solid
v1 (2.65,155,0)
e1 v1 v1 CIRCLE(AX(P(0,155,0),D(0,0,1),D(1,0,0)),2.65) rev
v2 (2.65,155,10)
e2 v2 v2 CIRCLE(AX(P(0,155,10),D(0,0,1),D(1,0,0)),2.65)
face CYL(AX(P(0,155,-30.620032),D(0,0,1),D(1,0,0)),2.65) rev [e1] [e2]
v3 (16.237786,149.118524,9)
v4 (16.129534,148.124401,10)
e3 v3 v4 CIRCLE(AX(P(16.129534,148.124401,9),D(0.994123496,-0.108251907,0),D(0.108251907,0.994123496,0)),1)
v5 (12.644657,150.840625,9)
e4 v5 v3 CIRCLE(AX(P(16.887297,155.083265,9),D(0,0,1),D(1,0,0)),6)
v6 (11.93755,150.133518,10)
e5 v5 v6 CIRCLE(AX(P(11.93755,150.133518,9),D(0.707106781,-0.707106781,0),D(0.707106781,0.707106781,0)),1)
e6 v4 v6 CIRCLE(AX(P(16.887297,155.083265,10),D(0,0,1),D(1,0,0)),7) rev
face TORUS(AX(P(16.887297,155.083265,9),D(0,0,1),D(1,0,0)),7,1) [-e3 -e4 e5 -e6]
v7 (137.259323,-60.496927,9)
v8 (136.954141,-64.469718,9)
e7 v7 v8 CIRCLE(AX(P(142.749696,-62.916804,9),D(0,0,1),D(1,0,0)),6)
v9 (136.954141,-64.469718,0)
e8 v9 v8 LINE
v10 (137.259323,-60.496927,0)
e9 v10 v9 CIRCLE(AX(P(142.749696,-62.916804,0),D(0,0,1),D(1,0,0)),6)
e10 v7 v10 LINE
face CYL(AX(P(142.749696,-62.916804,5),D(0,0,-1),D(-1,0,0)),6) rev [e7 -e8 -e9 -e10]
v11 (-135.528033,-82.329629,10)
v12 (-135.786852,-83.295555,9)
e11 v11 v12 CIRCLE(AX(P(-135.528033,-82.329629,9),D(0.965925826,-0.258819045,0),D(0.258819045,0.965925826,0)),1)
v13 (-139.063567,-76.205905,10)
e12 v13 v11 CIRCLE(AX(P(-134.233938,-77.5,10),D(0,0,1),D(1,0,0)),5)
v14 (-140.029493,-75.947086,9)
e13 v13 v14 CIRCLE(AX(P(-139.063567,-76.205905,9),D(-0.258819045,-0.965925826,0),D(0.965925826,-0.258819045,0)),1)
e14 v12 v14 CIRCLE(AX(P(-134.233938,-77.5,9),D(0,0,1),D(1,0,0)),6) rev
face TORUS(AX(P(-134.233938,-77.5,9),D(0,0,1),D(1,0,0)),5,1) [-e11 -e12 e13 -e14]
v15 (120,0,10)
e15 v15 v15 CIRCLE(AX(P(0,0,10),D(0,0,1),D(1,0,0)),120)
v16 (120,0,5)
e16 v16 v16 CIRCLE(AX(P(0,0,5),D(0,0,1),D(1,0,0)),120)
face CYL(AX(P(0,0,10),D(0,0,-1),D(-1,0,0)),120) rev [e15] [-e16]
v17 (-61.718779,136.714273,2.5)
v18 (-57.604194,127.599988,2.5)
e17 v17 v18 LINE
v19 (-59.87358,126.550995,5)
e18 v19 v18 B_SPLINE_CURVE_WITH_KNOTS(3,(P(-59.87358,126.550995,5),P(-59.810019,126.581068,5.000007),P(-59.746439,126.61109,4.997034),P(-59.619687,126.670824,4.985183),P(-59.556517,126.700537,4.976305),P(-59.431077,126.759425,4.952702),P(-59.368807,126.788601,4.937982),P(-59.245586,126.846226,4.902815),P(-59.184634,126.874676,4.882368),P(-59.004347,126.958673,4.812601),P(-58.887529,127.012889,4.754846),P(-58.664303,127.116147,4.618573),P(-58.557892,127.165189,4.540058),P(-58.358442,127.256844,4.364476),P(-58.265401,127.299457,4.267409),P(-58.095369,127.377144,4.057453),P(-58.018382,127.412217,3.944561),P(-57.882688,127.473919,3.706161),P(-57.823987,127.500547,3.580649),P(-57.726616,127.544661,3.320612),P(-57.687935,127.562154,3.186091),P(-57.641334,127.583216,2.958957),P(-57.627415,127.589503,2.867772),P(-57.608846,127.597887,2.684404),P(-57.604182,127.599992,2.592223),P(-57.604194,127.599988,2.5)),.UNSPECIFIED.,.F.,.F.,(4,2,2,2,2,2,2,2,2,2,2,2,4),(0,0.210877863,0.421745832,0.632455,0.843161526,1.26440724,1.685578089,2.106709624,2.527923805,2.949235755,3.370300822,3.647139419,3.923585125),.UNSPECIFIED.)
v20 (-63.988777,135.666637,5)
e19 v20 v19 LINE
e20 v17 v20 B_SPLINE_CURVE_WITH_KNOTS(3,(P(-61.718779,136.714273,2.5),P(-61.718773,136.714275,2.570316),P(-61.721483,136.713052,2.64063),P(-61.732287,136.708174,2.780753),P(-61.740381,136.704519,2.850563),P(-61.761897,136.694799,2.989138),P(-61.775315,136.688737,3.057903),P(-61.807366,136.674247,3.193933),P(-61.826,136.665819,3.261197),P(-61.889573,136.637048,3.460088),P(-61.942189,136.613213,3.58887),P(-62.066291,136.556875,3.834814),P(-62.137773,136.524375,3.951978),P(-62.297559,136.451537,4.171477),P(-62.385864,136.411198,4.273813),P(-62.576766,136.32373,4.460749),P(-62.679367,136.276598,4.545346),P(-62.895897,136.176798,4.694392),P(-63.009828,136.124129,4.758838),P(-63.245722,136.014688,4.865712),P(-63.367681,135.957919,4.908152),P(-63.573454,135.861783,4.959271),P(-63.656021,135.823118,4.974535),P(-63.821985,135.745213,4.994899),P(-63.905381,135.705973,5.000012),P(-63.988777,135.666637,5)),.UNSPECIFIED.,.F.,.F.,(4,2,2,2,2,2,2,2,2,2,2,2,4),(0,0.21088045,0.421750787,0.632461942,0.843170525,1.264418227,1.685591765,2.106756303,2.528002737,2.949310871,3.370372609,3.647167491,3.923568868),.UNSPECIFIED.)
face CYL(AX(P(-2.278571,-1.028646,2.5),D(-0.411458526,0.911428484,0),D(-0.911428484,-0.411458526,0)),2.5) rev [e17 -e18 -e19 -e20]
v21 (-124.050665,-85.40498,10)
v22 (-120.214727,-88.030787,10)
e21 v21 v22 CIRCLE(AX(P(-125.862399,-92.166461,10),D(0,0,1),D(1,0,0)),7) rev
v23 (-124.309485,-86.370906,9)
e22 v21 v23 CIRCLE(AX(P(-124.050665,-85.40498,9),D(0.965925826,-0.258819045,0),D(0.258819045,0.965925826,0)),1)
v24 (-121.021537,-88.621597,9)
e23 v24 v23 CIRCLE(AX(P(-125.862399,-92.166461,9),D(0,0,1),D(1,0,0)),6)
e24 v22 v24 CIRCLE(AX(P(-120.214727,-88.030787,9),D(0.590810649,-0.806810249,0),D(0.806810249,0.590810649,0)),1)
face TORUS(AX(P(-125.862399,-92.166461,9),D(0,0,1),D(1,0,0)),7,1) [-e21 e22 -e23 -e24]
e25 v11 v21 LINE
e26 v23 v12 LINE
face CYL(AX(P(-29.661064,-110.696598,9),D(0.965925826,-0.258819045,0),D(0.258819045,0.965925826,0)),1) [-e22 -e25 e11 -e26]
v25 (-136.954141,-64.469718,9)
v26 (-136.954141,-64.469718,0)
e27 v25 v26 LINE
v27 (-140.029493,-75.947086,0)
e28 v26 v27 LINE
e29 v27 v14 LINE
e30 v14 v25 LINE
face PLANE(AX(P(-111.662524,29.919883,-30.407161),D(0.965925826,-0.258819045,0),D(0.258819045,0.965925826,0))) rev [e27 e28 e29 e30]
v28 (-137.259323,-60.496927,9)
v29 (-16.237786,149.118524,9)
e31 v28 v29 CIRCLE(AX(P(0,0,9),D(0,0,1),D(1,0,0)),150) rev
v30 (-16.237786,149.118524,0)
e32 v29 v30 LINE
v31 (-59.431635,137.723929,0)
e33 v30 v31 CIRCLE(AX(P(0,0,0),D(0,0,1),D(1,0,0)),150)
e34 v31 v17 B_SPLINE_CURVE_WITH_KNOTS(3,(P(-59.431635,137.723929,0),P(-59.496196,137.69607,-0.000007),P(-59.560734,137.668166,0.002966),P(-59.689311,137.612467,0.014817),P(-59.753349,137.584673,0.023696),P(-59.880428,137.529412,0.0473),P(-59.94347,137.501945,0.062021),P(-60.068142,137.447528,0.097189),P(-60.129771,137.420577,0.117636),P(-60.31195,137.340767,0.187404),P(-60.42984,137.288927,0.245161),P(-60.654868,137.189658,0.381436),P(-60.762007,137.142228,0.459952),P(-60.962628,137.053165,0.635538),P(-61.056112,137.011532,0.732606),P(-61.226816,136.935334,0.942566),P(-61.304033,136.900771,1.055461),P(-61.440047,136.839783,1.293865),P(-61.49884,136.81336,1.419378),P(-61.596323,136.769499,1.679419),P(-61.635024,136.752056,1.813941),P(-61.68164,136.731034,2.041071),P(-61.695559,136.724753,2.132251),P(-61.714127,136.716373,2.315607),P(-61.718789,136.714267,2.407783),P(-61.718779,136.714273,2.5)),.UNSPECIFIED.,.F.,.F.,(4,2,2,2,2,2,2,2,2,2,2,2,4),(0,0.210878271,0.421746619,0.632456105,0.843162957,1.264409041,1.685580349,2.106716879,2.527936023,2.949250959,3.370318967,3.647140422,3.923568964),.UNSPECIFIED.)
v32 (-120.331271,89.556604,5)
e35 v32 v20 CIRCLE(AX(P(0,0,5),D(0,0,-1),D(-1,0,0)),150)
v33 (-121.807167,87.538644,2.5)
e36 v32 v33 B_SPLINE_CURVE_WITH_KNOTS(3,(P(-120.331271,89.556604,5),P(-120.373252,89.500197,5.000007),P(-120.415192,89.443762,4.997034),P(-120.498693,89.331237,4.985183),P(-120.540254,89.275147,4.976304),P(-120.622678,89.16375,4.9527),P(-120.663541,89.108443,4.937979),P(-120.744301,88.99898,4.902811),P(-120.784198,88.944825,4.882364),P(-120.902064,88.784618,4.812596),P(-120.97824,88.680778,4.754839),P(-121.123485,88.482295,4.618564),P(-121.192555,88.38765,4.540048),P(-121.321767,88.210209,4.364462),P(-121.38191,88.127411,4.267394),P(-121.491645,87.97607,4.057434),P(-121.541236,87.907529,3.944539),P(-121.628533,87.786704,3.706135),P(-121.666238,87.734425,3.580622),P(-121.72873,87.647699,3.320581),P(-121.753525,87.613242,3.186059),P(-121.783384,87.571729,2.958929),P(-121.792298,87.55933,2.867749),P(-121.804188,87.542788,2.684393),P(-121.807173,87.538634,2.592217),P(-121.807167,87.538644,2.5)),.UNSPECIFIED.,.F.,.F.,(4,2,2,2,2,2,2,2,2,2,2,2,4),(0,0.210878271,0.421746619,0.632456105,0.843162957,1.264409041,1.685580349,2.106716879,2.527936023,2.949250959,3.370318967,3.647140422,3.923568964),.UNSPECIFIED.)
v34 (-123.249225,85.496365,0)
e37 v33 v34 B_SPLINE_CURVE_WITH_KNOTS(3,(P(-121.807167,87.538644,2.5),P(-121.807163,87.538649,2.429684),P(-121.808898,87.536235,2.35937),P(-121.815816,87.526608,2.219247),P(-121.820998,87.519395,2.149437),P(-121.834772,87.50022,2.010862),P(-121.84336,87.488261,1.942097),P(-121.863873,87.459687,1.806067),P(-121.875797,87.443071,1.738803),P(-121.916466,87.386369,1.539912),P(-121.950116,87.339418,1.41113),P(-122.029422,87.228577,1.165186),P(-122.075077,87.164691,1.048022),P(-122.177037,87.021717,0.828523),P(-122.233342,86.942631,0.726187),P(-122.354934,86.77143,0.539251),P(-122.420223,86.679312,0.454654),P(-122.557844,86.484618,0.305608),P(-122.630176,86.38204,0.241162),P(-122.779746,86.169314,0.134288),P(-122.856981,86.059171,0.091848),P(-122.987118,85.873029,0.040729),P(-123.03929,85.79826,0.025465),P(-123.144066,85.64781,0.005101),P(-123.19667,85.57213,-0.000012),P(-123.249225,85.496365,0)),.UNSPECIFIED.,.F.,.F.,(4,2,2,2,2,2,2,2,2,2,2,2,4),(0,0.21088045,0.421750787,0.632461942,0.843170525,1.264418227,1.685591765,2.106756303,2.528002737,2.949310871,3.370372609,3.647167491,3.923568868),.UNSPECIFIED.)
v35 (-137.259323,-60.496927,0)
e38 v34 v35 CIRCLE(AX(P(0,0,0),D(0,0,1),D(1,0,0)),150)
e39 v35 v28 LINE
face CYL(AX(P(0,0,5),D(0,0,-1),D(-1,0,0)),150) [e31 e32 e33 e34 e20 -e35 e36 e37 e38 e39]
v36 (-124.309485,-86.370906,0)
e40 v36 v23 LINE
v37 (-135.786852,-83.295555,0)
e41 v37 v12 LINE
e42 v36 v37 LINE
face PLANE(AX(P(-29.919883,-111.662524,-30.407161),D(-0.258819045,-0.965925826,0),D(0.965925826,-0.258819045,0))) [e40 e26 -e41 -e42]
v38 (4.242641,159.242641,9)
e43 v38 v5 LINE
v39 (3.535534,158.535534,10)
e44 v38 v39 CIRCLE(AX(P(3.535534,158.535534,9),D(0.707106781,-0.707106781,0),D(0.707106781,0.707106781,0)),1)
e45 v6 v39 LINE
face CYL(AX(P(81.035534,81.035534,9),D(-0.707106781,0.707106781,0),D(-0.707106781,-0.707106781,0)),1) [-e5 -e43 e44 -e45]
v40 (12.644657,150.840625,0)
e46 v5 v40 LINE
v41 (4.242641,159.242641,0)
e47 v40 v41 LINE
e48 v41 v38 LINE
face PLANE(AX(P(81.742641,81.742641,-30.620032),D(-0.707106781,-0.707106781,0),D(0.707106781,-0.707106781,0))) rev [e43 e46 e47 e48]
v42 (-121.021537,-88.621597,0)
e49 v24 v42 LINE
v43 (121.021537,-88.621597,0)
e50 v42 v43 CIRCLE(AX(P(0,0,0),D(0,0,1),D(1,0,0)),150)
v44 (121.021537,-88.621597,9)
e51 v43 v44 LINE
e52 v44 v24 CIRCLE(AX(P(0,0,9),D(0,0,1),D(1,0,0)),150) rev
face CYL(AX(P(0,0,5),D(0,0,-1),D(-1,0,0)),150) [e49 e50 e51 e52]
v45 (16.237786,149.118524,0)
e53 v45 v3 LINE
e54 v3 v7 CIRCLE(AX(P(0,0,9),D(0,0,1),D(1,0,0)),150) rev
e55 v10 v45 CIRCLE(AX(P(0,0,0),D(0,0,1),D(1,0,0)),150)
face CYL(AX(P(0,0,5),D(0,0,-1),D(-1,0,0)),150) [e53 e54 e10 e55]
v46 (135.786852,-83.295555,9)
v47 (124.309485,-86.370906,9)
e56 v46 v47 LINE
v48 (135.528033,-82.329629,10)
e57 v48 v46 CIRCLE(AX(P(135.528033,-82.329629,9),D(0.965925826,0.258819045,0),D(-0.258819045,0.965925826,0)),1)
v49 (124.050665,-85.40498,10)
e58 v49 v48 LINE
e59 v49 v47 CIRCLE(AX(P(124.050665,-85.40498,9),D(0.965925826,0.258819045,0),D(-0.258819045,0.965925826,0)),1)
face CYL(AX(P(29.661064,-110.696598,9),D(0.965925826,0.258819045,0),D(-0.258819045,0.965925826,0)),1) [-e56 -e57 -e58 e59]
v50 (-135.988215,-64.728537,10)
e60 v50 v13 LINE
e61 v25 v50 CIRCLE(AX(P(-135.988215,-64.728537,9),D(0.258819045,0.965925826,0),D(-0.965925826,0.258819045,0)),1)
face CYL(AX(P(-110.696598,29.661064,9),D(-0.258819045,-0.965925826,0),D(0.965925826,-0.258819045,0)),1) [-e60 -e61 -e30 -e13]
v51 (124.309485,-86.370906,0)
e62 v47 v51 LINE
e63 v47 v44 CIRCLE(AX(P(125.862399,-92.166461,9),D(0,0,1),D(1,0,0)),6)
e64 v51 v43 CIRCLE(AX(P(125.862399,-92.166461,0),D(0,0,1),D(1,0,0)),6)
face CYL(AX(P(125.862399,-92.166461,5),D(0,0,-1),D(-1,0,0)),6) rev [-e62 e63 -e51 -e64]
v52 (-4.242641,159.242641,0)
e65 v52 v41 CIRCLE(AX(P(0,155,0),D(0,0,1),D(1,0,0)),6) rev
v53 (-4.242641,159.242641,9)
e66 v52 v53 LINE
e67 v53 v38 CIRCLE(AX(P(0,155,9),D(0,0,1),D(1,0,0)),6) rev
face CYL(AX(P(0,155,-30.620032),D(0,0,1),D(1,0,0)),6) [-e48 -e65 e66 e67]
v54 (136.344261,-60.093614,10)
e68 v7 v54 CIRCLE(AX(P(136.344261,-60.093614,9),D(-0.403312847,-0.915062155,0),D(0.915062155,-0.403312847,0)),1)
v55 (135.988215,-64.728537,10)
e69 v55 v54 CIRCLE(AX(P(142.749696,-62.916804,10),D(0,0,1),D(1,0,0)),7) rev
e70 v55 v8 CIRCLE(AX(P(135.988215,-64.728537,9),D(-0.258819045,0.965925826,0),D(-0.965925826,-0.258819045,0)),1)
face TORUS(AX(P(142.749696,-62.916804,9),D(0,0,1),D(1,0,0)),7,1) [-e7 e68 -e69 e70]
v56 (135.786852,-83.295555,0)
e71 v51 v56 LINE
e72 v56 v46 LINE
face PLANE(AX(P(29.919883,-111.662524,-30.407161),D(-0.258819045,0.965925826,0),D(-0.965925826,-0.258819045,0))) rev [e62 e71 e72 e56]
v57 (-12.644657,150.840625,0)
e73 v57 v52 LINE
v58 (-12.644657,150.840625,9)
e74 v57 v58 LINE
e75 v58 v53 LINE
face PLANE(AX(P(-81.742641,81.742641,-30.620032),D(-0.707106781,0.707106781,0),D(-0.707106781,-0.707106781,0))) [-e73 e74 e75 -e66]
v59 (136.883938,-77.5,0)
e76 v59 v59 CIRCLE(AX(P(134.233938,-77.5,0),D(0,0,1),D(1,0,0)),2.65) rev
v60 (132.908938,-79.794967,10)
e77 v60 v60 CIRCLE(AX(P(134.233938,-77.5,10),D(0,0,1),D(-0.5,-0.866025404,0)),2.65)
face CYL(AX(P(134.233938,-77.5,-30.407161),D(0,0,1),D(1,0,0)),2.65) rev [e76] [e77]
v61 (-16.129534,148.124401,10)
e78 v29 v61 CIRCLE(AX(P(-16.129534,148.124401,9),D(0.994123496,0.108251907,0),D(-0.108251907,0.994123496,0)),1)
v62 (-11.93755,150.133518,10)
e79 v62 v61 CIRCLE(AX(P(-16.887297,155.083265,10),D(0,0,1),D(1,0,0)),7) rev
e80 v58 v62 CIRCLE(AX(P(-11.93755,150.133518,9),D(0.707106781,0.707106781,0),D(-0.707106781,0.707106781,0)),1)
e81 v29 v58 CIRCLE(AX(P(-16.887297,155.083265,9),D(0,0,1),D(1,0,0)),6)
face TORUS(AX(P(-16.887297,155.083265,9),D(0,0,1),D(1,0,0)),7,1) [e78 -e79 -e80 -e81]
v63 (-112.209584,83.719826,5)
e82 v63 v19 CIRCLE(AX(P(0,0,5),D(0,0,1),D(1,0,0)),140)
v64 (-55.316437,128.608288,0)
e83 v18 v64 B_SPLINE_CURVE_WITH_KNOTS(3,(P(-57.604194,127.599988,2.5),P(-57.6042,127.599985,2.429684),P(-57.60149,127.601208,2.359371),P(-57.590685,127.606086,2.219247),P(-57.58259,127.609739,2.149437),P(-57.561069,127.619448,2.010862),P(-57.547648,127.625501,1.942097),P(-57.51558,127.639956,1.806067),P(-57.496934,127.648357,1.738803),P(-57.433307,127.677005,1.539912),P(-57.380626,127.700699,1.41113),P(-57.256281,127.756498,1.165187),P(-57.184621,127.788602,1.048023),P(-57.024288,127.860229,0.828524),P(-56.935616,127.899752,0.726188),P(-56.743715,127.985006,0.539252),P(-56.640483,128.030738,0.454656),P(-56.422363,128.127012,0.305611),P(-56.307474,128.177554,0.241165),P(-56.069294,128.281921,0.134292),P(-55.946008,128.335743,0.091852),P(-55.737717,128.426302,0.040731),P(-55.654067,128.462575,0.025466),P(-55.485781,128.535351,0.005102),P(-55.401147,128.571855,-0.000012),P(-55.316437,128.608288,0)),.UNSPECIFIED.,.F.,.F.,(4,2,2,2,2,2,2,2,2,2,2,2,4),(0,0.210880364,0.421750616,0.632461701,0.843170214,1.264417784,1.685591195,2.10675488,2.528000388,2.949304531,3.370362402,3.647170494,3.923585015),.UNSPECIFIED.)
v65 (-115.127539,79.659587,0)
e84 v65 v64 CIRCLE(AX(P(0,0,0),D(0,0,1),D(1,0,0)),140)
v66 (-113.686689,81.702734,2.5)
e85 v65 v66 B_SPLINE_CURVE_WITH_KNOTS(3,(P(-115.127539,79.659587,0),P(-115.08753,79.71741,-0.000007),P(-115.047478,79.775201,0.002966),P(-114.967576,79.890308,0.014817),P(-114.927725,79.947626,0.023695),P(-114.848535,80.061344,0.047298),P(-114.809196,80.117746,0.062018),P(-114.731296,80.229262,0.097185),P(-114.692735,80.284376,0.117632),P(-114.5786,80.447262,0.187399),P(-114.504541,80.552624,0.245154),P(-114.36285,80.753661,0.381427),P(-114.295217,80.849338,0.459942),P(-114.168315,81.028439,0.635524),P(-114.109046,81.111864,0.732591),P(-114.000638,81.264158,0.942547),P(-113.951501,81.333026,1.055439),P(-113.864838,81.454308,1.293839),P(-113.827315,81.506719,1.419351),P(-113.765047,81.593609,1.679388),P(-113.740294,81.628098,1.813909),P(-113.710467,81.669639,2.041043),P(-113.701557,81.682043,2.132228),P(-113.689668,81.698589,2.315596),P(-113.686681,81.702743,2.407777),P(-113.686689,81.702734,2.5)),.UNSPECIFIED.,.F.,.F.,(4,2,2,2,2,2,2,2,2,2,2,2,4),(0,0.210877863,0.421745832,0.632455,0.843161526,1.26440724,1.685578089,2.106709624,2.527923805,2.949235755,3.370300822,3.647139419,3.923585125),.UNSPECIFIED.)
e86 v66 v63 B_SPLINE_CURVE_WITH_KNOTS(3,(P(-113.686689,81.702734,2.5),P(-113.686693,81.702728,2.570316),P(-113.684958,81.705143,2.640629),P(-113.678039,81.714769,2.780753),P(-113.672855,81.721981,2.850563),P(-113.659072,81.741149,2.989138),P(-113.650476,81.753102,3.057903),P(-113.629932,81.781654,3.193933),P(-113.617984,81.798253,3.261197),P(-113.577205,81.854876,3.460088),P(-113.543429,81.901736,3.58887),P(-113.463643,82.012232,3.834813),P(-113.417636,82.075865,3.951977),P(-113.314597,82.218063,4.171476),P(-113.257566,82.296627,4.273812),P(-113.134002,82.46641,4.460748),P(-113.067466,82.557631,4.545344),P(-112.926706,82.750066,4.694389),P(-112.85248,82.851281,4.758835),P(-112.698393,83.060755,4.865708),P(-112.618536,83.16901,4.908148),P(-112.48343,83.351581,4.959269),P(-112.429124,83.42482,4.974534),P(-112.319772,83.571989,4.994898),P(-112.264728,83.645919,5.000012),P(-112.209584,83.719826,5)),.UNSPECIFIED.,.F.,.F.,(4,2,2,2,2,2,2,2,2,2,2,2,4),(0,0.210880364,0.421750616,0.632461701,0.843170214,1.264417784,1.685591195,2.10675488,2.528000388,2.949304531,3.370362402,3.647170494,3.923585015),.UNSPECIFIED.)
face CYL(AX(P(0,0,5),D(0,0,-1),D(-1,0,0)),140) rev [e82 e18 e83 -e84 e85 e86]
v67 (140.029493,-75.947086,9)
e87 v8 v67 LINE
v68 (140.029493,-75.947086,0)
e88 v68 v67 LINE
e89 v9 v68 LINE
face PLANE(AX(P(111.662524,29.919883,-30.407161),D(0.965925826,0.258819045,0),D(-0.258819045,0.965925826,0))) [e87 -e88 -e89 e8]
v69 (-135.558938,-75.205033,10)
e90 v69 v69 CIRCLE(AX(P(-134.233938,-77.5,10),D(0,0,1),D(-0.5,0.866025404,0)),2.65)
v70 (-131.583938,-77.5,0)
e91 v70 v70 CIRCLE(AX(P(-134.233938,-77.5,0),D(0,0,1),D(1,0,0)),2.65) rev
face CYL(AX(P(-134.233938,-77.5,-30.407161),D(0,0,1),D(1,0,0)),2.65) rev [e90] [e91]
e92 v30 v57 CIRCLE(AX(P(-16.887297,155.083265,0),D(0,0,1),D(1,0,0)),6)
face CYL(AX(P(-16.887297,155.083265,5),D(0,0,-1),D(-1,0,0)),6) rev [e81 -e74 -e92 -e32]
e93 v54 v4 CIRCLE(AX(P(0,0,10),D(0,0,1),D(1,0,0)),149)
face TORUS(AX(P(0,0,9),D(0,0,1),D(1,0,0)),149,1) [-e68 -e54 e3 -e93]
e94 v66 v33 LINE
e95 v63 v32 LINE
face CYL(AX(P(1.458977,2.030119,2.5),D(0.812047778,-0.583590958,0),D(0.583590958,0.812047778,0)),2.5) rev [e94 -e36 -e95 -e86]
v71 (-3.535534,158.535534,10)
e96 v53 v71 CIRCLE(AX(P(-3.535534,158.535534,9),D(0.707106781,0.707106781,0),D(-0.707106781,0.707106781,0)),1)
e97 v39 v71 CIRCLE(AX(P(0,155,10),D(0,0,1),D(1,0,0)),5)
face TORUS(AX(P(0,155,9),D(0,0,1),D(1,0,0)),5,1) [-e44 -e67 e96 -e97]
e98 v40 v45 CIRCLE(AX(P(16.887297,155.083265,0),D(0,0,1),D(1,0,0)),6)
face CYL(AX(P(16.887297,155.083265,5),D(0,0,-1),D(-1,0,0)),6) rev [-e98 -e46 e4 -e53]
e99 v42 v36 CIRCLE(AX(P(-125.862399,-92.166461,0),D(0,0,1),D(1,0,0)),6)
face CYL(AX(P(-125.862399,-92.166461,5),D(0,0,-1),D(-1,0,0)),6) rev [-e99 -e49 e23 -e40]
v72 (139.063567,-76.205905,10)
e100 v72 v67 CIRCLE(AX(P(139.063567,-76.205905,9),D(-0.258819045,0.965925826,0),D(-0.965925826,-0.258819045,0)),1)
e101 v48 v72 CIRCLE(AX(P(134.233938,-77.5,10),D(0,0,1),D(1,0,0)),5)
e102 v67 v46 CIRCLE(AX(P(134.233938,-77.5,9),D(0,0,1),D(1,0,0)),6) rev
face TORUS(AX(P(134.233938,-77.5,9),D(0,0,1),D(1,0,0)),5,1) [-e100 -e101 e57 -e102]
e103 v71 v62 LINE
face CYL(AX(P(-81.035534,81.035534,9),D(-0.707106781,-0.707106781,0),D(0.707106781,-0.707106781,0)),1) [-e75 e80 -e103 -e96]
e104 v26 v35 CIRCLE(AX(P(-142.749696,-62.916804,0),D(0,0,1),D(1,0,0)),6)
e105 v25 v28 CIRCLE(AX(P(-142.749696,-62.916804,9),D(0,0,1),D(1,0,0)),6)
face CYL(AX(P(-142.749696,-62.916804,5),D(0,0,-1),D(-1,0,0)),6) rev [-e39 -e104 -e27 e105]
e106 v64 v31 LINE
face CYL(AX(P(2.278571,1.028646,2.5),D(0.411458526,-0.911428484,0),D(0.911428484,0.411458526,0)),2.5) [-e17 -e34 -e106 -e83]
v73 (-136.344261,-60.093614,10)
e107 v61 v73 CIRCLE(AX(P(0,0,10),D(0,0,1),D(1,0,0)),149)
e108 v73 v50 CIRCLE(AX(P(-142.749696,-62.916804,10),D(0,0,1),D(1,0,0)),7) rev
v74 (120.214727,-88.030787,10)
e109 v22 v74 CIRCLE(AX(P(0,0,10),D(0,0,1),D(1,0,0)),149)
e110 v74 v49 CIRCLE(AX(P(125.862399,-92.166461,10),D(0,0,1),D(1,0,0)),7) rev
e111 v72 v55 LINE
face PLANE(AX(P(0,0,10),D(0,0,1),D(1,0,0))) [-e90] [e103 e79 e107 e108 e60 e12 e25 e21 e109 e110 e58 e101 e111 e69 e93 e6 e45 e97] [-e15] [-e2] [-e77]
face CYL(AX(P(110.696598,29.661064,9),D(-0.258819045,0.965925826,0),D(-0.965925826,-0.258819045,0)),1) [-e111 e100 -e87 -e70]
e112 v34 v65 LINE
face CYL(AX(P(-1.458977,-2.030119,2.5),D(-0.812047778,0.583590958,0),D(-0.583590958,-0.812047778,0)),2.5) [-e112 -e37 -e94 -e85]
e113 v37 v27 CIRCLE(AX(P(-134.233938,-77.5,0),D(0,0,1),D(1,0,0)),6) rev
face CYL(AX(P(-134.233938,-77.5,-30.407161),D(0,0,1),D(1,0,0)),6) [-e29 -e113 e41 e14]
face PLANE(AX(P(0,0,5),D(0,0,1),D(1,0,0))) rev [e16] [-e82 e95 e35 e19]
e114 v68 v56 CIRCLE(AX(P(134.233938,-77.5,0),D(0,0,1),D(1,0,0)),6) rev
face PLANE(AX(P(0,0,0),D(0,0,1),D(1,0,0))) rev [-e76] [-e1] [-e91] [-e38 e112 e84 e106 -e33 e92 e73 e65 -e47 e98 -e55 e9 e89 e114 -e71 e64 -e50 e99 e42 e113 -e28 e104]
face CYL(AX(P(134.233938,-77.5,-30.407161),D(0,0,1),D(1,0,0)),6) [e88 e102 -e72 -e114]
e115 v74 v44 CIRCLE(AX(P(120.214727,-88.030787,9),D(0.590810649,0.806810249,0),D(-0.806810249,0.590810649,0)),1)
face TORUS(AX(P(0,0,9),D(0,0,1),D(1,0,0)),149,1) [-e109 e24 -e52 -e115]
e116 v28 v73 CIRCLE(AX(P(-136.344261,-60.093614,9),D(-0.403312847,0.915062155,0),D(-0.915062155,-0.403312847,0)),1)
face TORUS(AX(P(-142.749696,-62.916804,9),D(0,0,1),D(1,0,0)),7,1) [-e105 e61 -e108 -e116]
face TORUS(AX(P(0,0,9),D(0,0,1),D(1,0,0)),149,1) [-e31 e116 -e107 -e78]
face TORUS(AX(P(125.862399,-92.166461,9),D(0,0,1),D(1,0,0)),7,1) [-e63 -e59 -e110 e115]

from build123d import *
from build123d.topology import SkipClean

# Parameters (mm, degrees)
SKETCH1_R                = 150
SKETCH1_R_2              = 140
BOSS_EXTRUDE1_DEPTH      = 5
SKETCH2_R                = 150
SKETCH2_R_2              = 120
BOSS_EXTRUDE2_DEPTH      = 5
BOSS_EXTRUDE3_START      = -10
SKETCH3_R                = 2.65
BOSS_EXTRUDE3_DEPTH      = 10
FILLET1_R                = 6
CIRPATTERN1_COUNT        = 3
FILLET1_OF_CIRPATTERN1_R = 6
FILLET2_R                = 1
CUT_EXTRUDE2_DEPTH       = 5
FILLET3_R                = 2.5


with BuildPart() as part:
    # Sketch1 → Boss-Extrude1 (new body)
    with BuildSketch(Plane.XY):
        Circle(SKETCH1_R)
        Circle(SKETCH1_R_2, mode=Mode.SUBTRACT)
    extrude(amount=BOSS_EXTRUDE1_DEPTH)

    # Sketch2 → Boss-Extrude2 (add)
    with BuildSketch(Plane.XY.offset(5)):
        Circle(SKETCH2_R)
        Circle(SKETCH2_R_2, mode=Mode.SUBTRACT)
    extrude(amount=BOSS_EXTRUDE2_DEPTH)

    # Sketch3 → Boss-Extrude3 (add)
    with BuildSketch(Plane.XY.offset(10).offset(BOSS_EXTRUDE3_START)):
        with BuildLine():
            ThreePointArc((-14.154618867, 149.330662507), (0, 150), (14.154618867, 149.330662507))
            Line((14.154618867, 149.330662507), (4.242640687, 159.242640687))
            ThreePointArc((4.242640687, 159.242640687), (0, 161), (-4.242640687, 159.242640687))
            Line((-4.242640687, 159.242640687), (-14.154618867, 149.330662507))
        make_face()
        with Locations((0, 155)):
            Circle(SKETCH3_R, mode=Mode.SUBTRACT)
    boss_extrude3 = extrude(amount=BOSS_EXTRUDE3_DEPTH)

    # Fillet1
    fillet1_edges = [part.edges().sort_by_distance(p)[0] for p in [
        (-14.154618867, 149.330662507, 5),
        (14.154618867, 149.330662507, 5),
    ]]
    fillet(fillet1_edges, radius=FILLET1_R)

    # CirPattern1: Boss-Extrude3 ×3 about axis
    cirpattern1_axis = Axis((0, 0, 0), (0, 0, 1))
    for i in range(1, CIRPATTERN1_COUNT):
        add(boss_extrude3.rotate(cirpattern1_axis, i * 360 / CIRPATTERN1_COUNT))

    # Fillet1 of CirPattern1
    fillet1_of_cirpattern1_edges = [part.edges().sort_by_distance(p)[0] for p in [
        (-122.246837861, -86.923590773, 5),
        (-136.401456729, -62.407071733, 5),
        (136.401456729, -62.407071733, 5),
        (122.246837861, -86.923590773, 5),
    ]]
    fillet(fillet1_of_cirpattern1_edges, radius=FILLET1_OF_CIRPATTERN1_R)

    # Fillet2
    fillet2_edges = [part.edges().sort_by_distance(p)[0] for p in [
        (8.443648708, 155.041632666, 10),
        (0, 161, 10),
        (-8.443648708, 155.041632666, 10),
        (-129.903810568, 75, 10),
        (-14.29409564, 149.672599518, 10),
        (14.29409564, 149.672599518, 10),
        (-138.491816887, -70.208402051, 10),
        (-139.430090009, -80.5, 10),
        (-130.048168179, -84.833230615, 10),
        (130.048168179, -84.833230615, 10),
        (139.430090009, -80.5, 10),
        (138.491816887, -70.208402051, 10),
        (0, -150, 10),
        (-122.473225614, -87.215349707, 10),
        (-136.767321253, -62.457249811, 10),
        (129.903810568, 75, 10),
        (136.767321253, -62.457249811, 10),
        (122.473225614, -87.215349707, 10),
    ]]
    fillet(fillet2_edges, radius=FILLET2_R)

    # Sketch4 → Cut-Extrude2 (cut)
    with SkipClean():  # the faces are left unmerged after this step: merging them gives an invalid solid
        with BuildSketch(Plane(origin=(0, 0, 0), x_dir=(-1, 0, 0), z_dir=(0, 0, -1))):
            with BuildLine():
                ThreePointArc((57.604193668, 127.599987743), (88.666685349, 108.343061196), (113.686688952, 81.702734074))
                Line((113.686688952, 81.702734074), (121.807166734, 87.538643651))
                ThreePointArc((121.807166734, 87.538643651), (95.000020016, 116.081851281), (61.718778929, 136.714272581))
                Line((61.718778929, 136.714272581), (57.604193668, 127.599987743))
            make_face()
            with BuildLine():
                ThreePointArc((55.546901037, 123.042845323), (85.500018015, 104.473666153), (109.626450061, 78.784779286))
                Line((109.626450061, 78.784779286), (113.686688952, 81.702734074))
                ThreePointArc((113.686688952, 81.702734074), (88.666685349, 108.343061196), (57.604193668, 127.599987743))
                Line((57.604193668, 127.599987743), (55.546901037, 123.042845323))
            make_face()
            with BuildLine():
                Line((113.686688952, 81.702734074), (109.626450061, 78.784779286))
                ThreePointArc((109.626450061, 78.784779286), (128.500137662, 41.384956456), (135, 0))
                ThreePointArc((135, 0), (-113.410386738, -73.233081186), (55.546901037, 123.042845323))
                Line((55.546901037, 123.042845323), (57.604193668, 127.599987743))
                ThreePointArc((57.604193668, 127.599987743), (-117.610771432, -75.945417526), (140, 0))
                ThreePointArc((140, 0), (133.25940202, 42.917732621), (113.686688952, 81.702734074))
            make_face()
        extrude(amount=-CUT_EXTRUDE2_DEPTH, mode=Mode.SUBTRACT)

    # Fillet3
    # the kernel refuses this fillet: 2.5 mm, written as the material it adds along each edge
    with BuildSketch(Plane(origin=(-55.032577879, 121.903559718, 5), x_dir=(0, 0, -1), z_dir=(-0.41145852619651707, 0.9114284838758278, 0))) as fillet3_piece_1_section:
        with BuildLine():
            CenterArc((FILLET3_R, FILLET3_R), FILLET3_R, 180, 90)
            Line((0, FILLET3_R), (0, 0))
            Line((0, 0), (FILLET3_R, 0))
        make_face()
    fillet3_piece_1 = extrude(amount=22.5, mode=Mode.PRIVATE)
    fillet3_piece_1 = fillet3_piece_1 & Plane(origin=(0, 0, 4.434016132), x_dir=(1, 0, 0), z_dir=(0, 0, -1)) * Cylinder(150, 56, mode=Mode.PRIVATE)
    fillet3_piece_1 = fillet3_piece_1 - Plane(origin=(0, 0, 4.434016132), x_dir=(1, 0, 0), z_dir=(0, 0, -1)) * Cylinder(140, 56, mode=Mode.PRIVATE)
    add(fillet3_piece_1)
    with BuildSketch(Plane(origin=(-108.611390338, 78.055290588, 5), x_dir=(0, 0, -1), z_dir=(-0.8120477782278018, 0.5835909576709453, 0))) as fillet3_piece_2_section:
        with BuildLine():
            CenterArc((FILLET3_R, -FILLET3_R), FILLET3_R, 90, 90)
            Line((0, -FILLET3_R), (0, 0))
            Line((0, 0), (FILLET3_R, 0))
        make_face()
    fillet3_piece_2 = extrude(amount=22.5, mode=Mode.PRIVATE)
    fillet3_piece_2 = fillet3_piece_2 & Plane(origin=(0, 0, 4.434018279), x_dir=(1, 0, 0), z_dir=(0, 0, -1)) * Cylinder(150, 55, mode=Mode.PRIVATE)
    fillet3_piece_2 = fillet3_piece_2 - Plane(origin=(0, 0, 4.434018279), x_dir=(-0.41145852619650086, 0.9114284838758352, 0), z_dir=(0, 0, -1)) * Cylinder(140, 55, mode=Mode.PRIVATE)
    add(fillet3_piece_2)
    # the kernel refuses this fillet: 2.5 mm, written as the material it takes off along each edge
    with BuildSketch(Plane(origin=(-64.290394718, 142.410700606, 0), x_dir=(0.9114284838758278, 0.4114585261965171, 0), z_dir=(0.41145852619651707, -0.9114284838758278, 0))) as fillet3_2_piece_1:
        with BuildLine():
            CenterArc((FILLET3_R, FILLET3_R), FILLET3_R, 180, 90)
            Line((0, FILLET3_R), (0, 0))
            Line((0, 0), (FILLET3_R, 0))
        make_face()
    extrude(amount=22.5, mode=Mode.SUBTRACT)
    with BuildSketch(Plane(origin=(-126.882465348, 91.186087136, 0), x_dir=(-0.5835909576709452, -0.8120477782278016, 0), z_dir=(0.8120477782278018, -0.5835909576709453, 0))) as fillet3_2_piece_2:
        with BuildLine():
            CenterArc((FILLET3_R, -FILLET3_R), FILLET3_R, 90, 90)
            Line((0, -FILLET3_R), (0, 0))
            Line((0, 0), (FILLET3_R, 0))
        make_face()
    extrude(amount=22.5, mode=Mode.SUBTRACT)


solid = part.part
